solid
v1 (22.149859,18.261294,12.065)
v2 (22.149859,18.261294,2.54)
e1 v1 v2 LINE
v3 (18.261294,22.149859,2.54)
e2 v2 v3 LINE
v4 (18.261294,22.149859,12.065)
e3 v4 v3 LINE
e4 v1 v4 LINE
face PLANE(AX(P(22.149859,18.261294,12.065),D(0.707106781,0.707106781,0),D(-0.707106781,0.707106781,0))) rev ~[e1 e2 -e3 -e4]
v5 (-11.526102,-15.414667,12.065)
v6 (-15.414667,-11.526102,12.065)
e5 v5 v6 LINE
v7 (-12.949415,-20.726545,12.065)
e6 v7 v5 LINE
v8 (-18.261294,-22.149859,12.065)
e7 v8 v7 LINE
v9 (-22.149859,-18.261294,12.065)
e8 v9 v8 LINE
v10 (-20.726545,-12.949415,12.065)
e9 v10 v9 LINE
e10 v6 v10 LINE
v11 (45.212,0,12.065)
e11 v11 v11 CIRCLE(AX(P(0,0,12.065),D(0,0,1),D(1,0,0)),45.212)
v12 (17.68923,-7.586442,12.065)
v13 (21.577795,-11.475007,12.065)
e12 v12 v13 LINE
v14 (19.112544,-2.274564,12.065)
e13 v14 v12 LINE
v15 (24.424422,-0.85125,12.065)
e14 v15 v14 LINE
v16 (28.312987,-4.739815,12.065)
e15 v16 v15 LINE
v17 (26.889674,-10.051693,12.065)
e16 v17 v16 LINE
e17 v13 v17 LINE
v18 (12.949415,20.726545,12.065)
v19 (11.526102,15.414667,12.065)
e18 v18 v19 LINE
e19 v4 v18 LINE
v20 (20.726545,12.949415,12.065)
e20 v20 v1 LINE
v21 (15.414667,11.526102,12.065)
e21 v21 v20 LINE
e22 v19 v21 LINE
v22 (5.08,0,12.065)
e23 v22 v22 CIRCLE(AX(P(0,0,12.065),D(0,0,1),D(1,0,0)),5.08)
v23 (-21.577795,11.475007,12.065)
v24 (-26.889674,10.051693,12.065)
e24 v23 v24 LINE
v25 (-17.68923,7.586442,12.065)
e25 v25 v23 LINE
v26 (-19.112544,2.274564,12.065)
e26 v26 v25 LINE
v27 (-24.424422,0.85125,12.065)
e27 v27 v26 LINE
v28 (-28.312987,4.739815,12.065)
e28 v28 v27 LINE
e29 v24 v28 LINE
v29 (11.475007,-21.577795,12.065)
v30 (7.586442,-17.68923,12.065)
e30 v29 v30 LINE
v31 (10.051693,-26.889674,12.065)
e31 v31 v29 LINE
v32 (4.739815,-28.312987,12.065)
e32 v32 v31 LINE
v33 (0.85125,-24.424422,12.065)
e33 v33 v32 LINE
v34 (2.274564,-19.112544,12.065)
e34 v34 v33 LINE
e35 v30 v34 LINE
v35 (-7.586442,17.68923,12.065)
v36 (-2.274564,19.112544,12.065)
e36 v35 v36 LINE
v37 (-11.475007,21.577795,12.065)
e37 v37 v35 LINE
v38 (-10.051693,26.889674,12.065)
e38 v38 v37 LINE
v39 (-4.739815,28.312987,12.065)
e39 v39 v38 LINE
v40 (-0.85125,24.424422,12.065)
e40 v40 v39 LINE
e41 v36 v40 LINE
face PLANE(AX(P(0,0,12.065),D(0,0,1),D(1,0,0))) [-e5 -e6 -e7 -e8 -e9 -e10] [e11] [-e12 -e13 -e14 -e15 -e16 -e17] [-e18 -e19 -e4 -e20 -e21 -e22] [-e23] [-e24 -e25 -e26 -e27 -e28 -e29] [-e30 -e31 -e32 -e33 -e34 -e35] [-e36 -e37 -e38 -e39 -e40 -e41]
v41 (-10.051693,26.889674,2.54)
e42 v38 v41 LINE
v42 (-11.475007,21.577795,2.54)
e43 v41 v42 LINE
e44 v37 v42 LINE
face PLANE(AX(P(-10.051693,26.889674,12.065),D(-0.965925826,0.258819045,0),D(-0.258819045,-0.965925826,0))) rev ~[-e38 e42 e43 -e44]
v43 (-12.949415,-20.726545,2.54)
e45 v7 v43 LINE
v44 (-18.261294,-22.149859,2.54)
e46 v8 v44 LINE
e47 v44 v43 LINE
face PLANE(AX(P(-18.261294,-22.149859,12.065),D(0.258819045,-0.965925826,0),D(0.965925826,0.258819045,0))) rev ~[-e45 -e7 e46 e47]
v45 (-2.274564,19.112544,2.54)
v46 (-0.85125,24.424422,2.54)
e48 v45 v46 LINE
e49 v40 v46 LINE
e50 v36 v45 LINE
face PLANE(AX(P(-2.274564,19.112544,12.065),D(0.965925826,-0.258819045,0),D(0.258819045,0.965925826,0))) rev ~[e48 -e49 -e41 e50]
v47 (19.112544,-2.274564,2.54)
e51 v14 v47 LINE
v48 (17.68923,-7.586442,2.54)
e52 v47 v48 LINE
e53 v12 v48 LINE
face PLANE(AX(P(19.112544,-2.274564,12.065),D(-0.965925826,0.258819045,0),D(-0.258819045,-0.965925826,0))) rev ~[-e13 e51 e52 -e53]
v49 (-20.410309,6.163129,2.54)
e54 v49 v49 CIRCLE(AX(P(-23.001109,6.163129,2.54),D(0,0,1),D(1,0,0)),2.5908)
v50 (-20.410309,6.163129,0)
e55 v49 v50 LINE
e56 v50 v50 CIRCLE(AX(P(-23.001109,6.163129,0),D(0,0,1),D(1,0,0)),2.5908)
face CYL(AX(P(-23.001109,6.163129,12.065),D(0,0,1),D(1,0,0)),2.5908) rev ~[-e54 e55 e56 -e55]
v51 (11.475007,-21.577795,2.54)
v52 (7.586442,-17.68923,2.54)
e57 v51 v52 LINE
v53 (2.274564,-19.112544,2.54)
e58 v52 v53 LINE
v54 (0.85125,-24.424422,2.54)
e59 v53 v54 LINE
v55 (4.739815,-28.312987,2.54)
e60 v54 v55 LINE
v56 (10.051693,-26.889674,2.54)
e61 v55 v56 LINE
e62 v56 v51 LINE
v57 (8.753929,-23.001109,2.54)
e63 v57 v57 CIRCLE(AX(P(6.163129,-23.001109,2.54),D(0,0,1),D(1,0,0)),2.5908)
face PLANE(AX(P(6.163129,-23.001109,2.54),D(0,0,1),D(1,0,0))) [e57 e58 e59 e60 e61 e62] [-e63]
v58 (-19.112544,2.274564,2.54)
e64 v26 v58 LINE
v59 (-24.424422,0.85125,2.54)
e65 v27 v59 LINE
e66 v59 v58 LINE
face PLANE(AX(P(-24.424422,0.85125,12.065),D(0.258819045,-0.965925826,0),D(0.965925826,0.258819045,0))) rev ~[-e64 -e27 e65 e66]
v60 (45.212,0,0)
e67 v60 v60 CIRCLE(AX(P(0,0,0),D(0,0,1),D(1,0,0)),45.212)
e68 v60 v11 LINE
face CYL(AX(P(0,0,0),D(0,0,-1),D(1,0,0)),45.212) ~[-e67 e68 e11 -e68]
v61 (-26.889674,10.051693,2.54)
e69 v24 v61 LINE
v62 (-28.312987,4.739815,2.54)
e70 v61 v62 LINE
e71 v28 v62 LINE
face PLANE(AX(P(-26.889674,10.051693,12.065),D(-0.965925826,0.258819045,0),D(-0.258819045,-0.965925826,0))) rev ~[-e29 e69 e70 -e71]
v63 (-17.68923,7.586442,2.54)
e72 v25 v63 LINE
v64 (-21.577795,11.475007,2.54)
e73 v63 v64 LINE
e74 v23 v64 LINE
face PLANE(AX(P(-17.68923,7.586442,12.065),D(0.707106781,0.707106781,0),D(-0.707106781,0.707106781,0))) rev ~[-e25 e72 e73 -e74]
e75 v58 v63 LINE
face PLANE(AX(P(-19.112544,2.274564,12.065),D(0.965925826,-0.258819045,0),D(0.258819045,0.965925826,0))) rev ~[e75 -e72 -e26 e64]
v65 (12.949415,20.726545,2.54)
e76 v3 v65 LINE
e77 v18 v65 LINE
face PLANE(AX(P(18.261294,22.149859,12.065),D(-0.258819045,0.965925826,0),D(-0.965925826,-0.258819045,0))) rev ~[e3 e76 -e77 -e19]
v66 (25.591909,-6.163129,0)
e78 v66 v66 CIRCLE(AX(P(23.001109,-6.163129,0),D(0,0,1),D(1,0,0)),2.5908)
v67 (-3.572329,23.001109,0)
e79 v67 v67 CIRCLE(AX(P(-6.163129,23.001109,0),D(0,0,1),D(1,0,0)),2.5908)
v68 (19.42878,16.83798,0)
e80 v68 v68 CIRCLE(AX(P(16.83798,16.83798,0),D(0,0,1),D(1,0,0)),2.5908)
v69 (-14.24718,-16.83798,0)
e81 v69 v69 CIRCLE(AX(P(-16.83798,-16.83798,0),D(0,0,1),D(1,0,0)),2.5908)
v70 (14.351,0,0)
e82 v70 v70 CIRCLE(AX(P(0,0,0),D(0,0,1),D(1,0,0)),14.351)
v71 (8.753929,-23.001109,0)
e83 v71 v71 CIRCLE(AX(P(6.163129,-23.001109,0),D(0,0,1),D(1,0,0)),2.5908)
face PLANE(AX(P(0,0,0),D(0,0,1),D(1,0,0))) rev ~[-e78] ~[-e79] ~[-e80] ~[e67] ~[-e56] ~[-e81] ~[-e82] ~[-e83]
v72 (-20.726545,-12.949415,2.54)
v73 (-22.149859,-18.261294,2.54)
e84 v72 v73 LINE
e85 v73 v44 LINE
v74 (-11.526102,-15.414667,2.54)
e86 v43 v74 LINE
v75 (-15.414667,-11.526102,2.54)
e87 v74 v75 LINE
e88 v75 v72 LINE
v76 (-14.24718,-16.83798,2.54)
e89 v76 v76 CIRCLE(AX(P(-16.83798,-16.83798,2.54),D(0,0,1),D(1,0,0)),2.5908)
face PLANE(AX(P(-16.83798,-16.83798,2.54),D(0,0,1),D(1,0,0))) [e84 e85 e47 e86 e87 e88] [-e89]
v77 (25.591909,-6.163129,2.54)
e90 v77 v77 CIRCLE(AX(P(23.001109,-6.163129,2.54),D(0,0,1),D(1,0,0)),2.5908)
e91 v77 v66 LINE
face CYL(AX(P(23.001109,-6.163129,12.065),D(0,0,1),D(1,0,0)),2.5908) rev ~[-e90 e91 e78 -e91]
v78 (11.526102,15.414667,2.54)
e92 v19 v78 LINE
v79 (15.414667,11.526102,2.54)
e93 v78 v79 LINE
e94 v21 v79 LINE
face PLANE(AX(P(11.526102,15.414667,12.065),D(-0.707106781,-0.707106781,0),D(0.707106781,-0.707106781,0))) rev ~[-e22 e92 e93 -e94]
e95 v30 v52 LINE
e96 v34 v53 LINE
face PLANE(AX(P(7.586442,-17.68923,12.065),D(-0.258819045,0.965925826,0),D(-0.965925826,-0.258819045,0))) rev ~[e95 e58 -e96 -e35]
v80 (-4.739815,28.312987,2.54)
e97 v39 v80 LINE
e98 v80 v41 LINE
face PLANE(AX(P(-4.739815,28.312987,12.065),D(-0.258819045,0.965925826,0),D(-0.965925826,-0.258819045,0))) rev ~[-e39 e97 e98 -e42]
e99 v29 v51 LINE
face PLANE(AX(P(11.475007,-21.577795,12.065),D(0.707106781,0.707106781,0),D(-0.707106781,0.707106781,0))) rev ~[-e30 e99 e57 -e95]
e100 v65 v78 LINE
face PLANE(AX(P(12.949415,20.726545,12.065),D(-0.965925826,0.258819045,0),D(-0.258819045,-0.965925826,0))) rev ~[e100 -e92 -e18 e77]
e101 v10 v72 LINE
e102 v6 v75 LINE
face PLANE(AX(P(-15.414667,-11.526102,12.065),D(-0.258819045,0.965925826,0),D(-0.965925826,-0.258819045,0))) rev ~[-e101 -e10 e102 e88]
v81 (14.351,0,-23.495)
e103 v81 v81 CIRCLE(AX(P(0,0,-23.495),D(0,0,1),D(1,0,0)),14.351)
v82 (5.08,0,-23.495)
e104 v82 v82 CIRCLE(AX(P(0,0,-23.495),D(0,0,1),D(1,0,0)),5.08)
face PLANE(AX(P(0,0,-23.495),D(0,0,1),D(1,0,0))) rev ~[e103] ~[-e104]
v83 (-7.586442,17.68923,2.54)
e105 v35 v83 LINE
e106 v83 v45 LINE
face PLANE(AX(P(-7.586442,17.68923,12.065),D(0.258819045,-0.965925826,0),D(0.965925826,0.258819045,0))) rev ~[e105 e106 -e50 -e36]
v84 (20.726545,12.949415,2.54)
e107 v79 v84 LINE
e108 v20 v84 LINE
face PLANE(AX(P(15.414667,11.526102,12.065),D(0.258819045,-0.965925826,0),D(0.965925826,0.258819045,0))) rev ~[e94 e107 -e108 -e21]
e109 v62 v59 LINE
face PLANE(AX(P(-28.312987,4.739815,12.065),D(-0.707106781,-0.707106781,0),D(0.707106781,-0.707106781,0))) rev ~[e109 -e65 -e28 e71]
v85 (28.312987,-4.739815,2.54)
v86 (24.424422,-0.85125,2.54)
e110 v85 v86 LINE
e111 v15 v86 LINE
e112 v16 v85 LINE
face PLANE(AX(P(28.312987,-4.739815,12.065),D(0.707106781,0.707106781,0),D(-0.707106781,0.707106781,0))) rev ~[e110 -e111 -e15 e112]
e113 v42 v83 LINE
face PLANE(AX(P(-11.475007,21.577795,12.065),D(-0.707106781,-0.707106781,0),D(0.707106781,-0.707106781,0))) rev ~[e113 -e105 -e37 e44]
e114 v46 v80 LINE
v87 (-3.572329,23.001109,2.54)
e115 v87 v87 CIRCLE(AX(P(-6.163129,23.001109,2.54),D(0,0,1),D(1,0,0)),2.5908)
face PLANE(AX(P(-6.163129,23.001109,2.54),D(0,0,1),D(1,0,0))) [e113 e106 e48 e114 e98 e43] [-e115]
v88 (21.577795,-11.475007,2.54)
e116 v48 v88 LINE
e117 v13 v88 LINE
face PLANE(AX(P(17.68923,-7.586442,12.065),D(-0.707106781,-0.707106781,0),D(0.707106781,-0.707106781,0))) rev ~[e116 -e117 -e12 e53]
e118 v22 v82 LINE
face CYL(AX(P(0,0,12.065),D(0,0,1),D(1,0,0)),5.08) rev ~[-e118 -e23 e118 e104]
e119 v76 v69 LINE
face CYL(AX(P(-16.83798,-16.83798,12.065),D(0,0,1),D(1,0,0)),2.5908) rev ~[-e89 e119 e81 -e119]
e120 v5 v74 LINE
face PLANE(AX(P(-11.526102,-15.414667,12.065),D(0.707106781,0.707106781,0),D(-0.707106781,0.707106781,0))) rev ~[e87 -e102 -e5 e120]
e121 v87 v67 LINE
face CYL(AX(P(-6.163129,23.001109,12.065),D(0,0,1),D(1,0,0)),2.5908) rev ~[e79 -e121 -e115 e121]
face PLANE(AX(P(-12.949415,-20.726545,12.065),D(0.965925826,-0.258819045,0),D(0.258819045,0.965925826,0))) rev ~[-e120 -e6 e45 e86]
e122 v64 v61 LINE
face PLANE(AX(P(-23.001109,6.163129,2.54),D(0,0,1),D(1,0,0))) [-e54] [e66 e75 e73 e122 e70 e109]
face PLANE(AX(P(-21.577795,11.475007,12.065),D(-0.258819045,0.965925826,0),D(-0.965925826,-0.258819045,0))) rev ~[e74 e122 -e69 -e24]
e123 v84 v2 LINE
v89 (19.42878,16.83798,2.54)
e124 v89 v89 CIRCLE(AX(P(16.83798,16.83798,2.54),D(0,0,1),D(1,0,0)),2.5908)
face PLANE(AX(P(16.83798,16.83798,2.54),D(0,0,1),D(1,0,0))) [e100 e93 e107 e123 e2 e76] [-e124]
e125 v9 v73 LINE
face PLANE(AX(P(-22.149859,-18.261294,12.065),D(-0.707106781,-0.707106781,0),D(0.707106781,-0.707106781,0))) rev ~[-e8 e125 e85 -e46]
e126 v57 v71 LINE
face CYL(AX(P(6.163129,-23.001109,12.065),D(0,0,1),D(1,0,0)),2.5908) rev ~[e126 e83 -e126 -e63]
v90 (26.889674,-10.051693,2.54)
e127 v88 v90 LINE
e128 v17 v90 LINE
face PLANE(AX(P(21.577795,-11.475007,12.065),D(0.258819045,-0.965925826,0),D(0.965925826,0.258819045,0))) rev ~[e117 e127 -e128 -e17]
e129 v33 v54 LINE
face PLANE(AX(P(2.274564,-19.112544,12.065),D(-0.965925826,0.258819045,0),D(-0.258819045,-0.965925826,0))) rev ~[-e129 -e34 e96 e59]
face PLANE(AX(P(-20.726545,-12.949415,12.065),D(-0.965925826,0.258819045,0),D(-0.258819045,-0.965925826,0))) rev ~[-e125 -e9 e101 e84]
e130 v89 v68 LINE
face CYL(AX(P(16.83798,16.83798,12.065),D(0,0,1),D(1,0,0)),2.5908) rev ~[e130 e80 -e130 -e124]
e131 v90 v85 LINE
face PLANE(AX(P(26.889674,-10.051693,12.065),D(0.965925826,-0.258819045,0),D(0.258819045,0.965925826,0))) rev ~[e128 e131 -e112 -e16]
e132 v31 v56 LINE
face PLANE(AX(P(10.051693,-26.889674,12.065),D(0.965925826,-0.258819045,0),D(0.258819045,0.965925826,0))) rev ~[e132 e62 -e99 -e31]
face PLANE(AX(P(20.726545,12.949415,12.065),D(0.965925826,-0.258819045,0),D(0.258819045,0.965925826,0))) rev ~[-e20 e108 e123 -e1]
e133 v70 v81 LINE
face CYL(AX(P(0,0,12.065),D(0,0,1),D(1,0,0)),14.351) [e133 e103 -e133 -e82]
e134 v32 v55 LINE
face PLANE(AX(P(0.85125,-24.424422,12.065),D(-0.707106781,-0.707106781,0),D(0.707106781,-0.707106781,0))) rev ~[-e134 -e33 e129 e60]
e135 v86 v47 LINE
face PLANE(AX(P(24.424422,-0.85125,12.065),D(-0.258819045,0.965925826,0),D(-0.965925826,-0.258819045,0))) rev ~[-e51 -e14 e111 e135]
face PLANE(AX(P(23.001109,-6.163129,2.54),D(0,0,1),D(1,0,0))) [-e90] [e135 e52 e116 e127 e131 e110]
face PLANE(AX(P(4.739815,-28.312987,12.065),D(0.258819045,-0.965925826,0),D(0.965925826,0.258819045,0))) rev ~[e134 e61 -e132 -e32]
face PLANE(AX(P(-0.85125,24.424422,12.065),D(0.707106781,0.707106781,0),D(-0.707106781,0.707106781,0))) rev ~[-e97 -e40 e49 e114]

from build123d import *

# Parameters (mm, degrees)
F0_R      = 45.212
F1_DEPTH  = 12.065
F2_R      = 2.5908
F3_DEPTH  = 25.4
F4_R      = 14.5415
F5_DEPTH  = 25.4
F7_DEPTH  = 9.525
F8_R      = 15.24
F9_DEPTH  = 12.065
F10_R     = 14.351
F11_DEPTH = 35.56
F12_R     = 5.08
F13_DEPTH = 38.1


# Not quite as in the source:
# - a feature names something its author has since deleted; it is built from what else it names


with BuildPart() as f1:
    # F0 (on Top) → F1 (new body)
    with BuildSketch(Plane.XY):
        Circle(F0_R)
    extrude(amount=F1_DEPTH)

    # F2 (on face) → F3 (cut)
    with BuildSketch(Plane.XY.offset(12.065)):
        with Locations((-6.1631285115, 23.0011087385)):
            Circle(F2_R)
        with Locations((-23.0011087385, 6.1631285115)):
            Circle(F2_R)
        with Locations((-16.837980227, -16.837980227)):
            Circle(F2_R)
        with Locations((6.1631285115, -23.0011087385)):
            Circle(F2_R)
        with Locations((23.0011087385, -6.1631285115)):
            Circle(F2_R)
        with Locations((16.837980227, 16.837980227)):
            Circle(F2_R)
    extrude(amount=-F3_DEPTH, mode=Mode.SUBTRACT)

    # F4 (on face) → F5 (cut)
    with BuildSketch(Plane.XY.offset(12.065)):
        Circle(F4_R)
    extrude(amount=-F5_DEPTH, mode=Mode.SUBTRACT)

    # F6 (on face) → F7 (cut)
    with BuildSketch(Plane.XY.offset(12.065)):
        Polygon((-4.7398149494, 28.3129872672), (-10.0516934782, 26.8896737052), (-11.4750070402, 21.5777951764), (-7.5864420736, 17.6892302098), (-2.2745635448, 19.1125437718), (-0.8512499828, 24.4244223006), align=None)
        Polygon((22.1498587557, 18.2612937891), (18.2612937891, 22.1498587557), (12.9494152603, 20.7265451937), (11.5261016983, 15.4146666649), (15.4146666649, 11.5261016983), (20.7265451937, 12.9494152603), align=None)
        Polygon((26.8896737052, -10.0516934782), (28.3129872672, -4.7398149494), (24.4244223006, -0.8512499828), (19.1125437718, -2.2745635448), (17.6892302098, -7.5864420736), (21.5777951764, -11.4750070402), align=None)
        Polygon((4.7398149494, -28.3129872672), (10.0516934782, -26.8896737052), (11.4750070402, -21.5777951764), (7.5864420736, -17.6892302098), (2.2745635448, -19.1125437718), (0.8512499828, -24.4244223006), align=None)
        Polygon((-22.1498587557, -18.2612937891), (-18.2612937891, -22.1498587557), (-12.9494152603, -20.7265451937), (-11.5261016983, -15.4146666649), (-15.4146666649, -11.5261016983), (-20.7265451937, -12.9494152603), align=None)
        Polygon((-26.8896737052, 10.0516934782), (-28.3129872672, 4.7398149494), (-24.4244223006, 0.8512499828), (-19.1125437718, 2.2745635448), (-17.6892302098, 7.5864420736), (-21.5777951764, 11.4750070402), align=None)
    extrude(amount=-F7_DEPTH, mode=Mode.SUBTRACT)

    # F8 (on face) → F9 (join)
    with BuildSketch(Plane.XY.offset(12.065)):
        Circle(F8_R)
    extrude(amount=-F9_DEPTH)

    # F10 (on face) → F11 (join)
    with BuildSketch(Plane.XY.offset(12.065)):
        Circle(F10_R)
    extrude(amount=-F11_DEPTH)

    # F12 (on face) → F13 (cut)
    with BuildSketch(Plane.XY.offset(12.065)):
        Circle(F12_R)
    extrude(amount=-F13_DEPTH, mode=Mode.SUBTRACT)


solid = f1.part
